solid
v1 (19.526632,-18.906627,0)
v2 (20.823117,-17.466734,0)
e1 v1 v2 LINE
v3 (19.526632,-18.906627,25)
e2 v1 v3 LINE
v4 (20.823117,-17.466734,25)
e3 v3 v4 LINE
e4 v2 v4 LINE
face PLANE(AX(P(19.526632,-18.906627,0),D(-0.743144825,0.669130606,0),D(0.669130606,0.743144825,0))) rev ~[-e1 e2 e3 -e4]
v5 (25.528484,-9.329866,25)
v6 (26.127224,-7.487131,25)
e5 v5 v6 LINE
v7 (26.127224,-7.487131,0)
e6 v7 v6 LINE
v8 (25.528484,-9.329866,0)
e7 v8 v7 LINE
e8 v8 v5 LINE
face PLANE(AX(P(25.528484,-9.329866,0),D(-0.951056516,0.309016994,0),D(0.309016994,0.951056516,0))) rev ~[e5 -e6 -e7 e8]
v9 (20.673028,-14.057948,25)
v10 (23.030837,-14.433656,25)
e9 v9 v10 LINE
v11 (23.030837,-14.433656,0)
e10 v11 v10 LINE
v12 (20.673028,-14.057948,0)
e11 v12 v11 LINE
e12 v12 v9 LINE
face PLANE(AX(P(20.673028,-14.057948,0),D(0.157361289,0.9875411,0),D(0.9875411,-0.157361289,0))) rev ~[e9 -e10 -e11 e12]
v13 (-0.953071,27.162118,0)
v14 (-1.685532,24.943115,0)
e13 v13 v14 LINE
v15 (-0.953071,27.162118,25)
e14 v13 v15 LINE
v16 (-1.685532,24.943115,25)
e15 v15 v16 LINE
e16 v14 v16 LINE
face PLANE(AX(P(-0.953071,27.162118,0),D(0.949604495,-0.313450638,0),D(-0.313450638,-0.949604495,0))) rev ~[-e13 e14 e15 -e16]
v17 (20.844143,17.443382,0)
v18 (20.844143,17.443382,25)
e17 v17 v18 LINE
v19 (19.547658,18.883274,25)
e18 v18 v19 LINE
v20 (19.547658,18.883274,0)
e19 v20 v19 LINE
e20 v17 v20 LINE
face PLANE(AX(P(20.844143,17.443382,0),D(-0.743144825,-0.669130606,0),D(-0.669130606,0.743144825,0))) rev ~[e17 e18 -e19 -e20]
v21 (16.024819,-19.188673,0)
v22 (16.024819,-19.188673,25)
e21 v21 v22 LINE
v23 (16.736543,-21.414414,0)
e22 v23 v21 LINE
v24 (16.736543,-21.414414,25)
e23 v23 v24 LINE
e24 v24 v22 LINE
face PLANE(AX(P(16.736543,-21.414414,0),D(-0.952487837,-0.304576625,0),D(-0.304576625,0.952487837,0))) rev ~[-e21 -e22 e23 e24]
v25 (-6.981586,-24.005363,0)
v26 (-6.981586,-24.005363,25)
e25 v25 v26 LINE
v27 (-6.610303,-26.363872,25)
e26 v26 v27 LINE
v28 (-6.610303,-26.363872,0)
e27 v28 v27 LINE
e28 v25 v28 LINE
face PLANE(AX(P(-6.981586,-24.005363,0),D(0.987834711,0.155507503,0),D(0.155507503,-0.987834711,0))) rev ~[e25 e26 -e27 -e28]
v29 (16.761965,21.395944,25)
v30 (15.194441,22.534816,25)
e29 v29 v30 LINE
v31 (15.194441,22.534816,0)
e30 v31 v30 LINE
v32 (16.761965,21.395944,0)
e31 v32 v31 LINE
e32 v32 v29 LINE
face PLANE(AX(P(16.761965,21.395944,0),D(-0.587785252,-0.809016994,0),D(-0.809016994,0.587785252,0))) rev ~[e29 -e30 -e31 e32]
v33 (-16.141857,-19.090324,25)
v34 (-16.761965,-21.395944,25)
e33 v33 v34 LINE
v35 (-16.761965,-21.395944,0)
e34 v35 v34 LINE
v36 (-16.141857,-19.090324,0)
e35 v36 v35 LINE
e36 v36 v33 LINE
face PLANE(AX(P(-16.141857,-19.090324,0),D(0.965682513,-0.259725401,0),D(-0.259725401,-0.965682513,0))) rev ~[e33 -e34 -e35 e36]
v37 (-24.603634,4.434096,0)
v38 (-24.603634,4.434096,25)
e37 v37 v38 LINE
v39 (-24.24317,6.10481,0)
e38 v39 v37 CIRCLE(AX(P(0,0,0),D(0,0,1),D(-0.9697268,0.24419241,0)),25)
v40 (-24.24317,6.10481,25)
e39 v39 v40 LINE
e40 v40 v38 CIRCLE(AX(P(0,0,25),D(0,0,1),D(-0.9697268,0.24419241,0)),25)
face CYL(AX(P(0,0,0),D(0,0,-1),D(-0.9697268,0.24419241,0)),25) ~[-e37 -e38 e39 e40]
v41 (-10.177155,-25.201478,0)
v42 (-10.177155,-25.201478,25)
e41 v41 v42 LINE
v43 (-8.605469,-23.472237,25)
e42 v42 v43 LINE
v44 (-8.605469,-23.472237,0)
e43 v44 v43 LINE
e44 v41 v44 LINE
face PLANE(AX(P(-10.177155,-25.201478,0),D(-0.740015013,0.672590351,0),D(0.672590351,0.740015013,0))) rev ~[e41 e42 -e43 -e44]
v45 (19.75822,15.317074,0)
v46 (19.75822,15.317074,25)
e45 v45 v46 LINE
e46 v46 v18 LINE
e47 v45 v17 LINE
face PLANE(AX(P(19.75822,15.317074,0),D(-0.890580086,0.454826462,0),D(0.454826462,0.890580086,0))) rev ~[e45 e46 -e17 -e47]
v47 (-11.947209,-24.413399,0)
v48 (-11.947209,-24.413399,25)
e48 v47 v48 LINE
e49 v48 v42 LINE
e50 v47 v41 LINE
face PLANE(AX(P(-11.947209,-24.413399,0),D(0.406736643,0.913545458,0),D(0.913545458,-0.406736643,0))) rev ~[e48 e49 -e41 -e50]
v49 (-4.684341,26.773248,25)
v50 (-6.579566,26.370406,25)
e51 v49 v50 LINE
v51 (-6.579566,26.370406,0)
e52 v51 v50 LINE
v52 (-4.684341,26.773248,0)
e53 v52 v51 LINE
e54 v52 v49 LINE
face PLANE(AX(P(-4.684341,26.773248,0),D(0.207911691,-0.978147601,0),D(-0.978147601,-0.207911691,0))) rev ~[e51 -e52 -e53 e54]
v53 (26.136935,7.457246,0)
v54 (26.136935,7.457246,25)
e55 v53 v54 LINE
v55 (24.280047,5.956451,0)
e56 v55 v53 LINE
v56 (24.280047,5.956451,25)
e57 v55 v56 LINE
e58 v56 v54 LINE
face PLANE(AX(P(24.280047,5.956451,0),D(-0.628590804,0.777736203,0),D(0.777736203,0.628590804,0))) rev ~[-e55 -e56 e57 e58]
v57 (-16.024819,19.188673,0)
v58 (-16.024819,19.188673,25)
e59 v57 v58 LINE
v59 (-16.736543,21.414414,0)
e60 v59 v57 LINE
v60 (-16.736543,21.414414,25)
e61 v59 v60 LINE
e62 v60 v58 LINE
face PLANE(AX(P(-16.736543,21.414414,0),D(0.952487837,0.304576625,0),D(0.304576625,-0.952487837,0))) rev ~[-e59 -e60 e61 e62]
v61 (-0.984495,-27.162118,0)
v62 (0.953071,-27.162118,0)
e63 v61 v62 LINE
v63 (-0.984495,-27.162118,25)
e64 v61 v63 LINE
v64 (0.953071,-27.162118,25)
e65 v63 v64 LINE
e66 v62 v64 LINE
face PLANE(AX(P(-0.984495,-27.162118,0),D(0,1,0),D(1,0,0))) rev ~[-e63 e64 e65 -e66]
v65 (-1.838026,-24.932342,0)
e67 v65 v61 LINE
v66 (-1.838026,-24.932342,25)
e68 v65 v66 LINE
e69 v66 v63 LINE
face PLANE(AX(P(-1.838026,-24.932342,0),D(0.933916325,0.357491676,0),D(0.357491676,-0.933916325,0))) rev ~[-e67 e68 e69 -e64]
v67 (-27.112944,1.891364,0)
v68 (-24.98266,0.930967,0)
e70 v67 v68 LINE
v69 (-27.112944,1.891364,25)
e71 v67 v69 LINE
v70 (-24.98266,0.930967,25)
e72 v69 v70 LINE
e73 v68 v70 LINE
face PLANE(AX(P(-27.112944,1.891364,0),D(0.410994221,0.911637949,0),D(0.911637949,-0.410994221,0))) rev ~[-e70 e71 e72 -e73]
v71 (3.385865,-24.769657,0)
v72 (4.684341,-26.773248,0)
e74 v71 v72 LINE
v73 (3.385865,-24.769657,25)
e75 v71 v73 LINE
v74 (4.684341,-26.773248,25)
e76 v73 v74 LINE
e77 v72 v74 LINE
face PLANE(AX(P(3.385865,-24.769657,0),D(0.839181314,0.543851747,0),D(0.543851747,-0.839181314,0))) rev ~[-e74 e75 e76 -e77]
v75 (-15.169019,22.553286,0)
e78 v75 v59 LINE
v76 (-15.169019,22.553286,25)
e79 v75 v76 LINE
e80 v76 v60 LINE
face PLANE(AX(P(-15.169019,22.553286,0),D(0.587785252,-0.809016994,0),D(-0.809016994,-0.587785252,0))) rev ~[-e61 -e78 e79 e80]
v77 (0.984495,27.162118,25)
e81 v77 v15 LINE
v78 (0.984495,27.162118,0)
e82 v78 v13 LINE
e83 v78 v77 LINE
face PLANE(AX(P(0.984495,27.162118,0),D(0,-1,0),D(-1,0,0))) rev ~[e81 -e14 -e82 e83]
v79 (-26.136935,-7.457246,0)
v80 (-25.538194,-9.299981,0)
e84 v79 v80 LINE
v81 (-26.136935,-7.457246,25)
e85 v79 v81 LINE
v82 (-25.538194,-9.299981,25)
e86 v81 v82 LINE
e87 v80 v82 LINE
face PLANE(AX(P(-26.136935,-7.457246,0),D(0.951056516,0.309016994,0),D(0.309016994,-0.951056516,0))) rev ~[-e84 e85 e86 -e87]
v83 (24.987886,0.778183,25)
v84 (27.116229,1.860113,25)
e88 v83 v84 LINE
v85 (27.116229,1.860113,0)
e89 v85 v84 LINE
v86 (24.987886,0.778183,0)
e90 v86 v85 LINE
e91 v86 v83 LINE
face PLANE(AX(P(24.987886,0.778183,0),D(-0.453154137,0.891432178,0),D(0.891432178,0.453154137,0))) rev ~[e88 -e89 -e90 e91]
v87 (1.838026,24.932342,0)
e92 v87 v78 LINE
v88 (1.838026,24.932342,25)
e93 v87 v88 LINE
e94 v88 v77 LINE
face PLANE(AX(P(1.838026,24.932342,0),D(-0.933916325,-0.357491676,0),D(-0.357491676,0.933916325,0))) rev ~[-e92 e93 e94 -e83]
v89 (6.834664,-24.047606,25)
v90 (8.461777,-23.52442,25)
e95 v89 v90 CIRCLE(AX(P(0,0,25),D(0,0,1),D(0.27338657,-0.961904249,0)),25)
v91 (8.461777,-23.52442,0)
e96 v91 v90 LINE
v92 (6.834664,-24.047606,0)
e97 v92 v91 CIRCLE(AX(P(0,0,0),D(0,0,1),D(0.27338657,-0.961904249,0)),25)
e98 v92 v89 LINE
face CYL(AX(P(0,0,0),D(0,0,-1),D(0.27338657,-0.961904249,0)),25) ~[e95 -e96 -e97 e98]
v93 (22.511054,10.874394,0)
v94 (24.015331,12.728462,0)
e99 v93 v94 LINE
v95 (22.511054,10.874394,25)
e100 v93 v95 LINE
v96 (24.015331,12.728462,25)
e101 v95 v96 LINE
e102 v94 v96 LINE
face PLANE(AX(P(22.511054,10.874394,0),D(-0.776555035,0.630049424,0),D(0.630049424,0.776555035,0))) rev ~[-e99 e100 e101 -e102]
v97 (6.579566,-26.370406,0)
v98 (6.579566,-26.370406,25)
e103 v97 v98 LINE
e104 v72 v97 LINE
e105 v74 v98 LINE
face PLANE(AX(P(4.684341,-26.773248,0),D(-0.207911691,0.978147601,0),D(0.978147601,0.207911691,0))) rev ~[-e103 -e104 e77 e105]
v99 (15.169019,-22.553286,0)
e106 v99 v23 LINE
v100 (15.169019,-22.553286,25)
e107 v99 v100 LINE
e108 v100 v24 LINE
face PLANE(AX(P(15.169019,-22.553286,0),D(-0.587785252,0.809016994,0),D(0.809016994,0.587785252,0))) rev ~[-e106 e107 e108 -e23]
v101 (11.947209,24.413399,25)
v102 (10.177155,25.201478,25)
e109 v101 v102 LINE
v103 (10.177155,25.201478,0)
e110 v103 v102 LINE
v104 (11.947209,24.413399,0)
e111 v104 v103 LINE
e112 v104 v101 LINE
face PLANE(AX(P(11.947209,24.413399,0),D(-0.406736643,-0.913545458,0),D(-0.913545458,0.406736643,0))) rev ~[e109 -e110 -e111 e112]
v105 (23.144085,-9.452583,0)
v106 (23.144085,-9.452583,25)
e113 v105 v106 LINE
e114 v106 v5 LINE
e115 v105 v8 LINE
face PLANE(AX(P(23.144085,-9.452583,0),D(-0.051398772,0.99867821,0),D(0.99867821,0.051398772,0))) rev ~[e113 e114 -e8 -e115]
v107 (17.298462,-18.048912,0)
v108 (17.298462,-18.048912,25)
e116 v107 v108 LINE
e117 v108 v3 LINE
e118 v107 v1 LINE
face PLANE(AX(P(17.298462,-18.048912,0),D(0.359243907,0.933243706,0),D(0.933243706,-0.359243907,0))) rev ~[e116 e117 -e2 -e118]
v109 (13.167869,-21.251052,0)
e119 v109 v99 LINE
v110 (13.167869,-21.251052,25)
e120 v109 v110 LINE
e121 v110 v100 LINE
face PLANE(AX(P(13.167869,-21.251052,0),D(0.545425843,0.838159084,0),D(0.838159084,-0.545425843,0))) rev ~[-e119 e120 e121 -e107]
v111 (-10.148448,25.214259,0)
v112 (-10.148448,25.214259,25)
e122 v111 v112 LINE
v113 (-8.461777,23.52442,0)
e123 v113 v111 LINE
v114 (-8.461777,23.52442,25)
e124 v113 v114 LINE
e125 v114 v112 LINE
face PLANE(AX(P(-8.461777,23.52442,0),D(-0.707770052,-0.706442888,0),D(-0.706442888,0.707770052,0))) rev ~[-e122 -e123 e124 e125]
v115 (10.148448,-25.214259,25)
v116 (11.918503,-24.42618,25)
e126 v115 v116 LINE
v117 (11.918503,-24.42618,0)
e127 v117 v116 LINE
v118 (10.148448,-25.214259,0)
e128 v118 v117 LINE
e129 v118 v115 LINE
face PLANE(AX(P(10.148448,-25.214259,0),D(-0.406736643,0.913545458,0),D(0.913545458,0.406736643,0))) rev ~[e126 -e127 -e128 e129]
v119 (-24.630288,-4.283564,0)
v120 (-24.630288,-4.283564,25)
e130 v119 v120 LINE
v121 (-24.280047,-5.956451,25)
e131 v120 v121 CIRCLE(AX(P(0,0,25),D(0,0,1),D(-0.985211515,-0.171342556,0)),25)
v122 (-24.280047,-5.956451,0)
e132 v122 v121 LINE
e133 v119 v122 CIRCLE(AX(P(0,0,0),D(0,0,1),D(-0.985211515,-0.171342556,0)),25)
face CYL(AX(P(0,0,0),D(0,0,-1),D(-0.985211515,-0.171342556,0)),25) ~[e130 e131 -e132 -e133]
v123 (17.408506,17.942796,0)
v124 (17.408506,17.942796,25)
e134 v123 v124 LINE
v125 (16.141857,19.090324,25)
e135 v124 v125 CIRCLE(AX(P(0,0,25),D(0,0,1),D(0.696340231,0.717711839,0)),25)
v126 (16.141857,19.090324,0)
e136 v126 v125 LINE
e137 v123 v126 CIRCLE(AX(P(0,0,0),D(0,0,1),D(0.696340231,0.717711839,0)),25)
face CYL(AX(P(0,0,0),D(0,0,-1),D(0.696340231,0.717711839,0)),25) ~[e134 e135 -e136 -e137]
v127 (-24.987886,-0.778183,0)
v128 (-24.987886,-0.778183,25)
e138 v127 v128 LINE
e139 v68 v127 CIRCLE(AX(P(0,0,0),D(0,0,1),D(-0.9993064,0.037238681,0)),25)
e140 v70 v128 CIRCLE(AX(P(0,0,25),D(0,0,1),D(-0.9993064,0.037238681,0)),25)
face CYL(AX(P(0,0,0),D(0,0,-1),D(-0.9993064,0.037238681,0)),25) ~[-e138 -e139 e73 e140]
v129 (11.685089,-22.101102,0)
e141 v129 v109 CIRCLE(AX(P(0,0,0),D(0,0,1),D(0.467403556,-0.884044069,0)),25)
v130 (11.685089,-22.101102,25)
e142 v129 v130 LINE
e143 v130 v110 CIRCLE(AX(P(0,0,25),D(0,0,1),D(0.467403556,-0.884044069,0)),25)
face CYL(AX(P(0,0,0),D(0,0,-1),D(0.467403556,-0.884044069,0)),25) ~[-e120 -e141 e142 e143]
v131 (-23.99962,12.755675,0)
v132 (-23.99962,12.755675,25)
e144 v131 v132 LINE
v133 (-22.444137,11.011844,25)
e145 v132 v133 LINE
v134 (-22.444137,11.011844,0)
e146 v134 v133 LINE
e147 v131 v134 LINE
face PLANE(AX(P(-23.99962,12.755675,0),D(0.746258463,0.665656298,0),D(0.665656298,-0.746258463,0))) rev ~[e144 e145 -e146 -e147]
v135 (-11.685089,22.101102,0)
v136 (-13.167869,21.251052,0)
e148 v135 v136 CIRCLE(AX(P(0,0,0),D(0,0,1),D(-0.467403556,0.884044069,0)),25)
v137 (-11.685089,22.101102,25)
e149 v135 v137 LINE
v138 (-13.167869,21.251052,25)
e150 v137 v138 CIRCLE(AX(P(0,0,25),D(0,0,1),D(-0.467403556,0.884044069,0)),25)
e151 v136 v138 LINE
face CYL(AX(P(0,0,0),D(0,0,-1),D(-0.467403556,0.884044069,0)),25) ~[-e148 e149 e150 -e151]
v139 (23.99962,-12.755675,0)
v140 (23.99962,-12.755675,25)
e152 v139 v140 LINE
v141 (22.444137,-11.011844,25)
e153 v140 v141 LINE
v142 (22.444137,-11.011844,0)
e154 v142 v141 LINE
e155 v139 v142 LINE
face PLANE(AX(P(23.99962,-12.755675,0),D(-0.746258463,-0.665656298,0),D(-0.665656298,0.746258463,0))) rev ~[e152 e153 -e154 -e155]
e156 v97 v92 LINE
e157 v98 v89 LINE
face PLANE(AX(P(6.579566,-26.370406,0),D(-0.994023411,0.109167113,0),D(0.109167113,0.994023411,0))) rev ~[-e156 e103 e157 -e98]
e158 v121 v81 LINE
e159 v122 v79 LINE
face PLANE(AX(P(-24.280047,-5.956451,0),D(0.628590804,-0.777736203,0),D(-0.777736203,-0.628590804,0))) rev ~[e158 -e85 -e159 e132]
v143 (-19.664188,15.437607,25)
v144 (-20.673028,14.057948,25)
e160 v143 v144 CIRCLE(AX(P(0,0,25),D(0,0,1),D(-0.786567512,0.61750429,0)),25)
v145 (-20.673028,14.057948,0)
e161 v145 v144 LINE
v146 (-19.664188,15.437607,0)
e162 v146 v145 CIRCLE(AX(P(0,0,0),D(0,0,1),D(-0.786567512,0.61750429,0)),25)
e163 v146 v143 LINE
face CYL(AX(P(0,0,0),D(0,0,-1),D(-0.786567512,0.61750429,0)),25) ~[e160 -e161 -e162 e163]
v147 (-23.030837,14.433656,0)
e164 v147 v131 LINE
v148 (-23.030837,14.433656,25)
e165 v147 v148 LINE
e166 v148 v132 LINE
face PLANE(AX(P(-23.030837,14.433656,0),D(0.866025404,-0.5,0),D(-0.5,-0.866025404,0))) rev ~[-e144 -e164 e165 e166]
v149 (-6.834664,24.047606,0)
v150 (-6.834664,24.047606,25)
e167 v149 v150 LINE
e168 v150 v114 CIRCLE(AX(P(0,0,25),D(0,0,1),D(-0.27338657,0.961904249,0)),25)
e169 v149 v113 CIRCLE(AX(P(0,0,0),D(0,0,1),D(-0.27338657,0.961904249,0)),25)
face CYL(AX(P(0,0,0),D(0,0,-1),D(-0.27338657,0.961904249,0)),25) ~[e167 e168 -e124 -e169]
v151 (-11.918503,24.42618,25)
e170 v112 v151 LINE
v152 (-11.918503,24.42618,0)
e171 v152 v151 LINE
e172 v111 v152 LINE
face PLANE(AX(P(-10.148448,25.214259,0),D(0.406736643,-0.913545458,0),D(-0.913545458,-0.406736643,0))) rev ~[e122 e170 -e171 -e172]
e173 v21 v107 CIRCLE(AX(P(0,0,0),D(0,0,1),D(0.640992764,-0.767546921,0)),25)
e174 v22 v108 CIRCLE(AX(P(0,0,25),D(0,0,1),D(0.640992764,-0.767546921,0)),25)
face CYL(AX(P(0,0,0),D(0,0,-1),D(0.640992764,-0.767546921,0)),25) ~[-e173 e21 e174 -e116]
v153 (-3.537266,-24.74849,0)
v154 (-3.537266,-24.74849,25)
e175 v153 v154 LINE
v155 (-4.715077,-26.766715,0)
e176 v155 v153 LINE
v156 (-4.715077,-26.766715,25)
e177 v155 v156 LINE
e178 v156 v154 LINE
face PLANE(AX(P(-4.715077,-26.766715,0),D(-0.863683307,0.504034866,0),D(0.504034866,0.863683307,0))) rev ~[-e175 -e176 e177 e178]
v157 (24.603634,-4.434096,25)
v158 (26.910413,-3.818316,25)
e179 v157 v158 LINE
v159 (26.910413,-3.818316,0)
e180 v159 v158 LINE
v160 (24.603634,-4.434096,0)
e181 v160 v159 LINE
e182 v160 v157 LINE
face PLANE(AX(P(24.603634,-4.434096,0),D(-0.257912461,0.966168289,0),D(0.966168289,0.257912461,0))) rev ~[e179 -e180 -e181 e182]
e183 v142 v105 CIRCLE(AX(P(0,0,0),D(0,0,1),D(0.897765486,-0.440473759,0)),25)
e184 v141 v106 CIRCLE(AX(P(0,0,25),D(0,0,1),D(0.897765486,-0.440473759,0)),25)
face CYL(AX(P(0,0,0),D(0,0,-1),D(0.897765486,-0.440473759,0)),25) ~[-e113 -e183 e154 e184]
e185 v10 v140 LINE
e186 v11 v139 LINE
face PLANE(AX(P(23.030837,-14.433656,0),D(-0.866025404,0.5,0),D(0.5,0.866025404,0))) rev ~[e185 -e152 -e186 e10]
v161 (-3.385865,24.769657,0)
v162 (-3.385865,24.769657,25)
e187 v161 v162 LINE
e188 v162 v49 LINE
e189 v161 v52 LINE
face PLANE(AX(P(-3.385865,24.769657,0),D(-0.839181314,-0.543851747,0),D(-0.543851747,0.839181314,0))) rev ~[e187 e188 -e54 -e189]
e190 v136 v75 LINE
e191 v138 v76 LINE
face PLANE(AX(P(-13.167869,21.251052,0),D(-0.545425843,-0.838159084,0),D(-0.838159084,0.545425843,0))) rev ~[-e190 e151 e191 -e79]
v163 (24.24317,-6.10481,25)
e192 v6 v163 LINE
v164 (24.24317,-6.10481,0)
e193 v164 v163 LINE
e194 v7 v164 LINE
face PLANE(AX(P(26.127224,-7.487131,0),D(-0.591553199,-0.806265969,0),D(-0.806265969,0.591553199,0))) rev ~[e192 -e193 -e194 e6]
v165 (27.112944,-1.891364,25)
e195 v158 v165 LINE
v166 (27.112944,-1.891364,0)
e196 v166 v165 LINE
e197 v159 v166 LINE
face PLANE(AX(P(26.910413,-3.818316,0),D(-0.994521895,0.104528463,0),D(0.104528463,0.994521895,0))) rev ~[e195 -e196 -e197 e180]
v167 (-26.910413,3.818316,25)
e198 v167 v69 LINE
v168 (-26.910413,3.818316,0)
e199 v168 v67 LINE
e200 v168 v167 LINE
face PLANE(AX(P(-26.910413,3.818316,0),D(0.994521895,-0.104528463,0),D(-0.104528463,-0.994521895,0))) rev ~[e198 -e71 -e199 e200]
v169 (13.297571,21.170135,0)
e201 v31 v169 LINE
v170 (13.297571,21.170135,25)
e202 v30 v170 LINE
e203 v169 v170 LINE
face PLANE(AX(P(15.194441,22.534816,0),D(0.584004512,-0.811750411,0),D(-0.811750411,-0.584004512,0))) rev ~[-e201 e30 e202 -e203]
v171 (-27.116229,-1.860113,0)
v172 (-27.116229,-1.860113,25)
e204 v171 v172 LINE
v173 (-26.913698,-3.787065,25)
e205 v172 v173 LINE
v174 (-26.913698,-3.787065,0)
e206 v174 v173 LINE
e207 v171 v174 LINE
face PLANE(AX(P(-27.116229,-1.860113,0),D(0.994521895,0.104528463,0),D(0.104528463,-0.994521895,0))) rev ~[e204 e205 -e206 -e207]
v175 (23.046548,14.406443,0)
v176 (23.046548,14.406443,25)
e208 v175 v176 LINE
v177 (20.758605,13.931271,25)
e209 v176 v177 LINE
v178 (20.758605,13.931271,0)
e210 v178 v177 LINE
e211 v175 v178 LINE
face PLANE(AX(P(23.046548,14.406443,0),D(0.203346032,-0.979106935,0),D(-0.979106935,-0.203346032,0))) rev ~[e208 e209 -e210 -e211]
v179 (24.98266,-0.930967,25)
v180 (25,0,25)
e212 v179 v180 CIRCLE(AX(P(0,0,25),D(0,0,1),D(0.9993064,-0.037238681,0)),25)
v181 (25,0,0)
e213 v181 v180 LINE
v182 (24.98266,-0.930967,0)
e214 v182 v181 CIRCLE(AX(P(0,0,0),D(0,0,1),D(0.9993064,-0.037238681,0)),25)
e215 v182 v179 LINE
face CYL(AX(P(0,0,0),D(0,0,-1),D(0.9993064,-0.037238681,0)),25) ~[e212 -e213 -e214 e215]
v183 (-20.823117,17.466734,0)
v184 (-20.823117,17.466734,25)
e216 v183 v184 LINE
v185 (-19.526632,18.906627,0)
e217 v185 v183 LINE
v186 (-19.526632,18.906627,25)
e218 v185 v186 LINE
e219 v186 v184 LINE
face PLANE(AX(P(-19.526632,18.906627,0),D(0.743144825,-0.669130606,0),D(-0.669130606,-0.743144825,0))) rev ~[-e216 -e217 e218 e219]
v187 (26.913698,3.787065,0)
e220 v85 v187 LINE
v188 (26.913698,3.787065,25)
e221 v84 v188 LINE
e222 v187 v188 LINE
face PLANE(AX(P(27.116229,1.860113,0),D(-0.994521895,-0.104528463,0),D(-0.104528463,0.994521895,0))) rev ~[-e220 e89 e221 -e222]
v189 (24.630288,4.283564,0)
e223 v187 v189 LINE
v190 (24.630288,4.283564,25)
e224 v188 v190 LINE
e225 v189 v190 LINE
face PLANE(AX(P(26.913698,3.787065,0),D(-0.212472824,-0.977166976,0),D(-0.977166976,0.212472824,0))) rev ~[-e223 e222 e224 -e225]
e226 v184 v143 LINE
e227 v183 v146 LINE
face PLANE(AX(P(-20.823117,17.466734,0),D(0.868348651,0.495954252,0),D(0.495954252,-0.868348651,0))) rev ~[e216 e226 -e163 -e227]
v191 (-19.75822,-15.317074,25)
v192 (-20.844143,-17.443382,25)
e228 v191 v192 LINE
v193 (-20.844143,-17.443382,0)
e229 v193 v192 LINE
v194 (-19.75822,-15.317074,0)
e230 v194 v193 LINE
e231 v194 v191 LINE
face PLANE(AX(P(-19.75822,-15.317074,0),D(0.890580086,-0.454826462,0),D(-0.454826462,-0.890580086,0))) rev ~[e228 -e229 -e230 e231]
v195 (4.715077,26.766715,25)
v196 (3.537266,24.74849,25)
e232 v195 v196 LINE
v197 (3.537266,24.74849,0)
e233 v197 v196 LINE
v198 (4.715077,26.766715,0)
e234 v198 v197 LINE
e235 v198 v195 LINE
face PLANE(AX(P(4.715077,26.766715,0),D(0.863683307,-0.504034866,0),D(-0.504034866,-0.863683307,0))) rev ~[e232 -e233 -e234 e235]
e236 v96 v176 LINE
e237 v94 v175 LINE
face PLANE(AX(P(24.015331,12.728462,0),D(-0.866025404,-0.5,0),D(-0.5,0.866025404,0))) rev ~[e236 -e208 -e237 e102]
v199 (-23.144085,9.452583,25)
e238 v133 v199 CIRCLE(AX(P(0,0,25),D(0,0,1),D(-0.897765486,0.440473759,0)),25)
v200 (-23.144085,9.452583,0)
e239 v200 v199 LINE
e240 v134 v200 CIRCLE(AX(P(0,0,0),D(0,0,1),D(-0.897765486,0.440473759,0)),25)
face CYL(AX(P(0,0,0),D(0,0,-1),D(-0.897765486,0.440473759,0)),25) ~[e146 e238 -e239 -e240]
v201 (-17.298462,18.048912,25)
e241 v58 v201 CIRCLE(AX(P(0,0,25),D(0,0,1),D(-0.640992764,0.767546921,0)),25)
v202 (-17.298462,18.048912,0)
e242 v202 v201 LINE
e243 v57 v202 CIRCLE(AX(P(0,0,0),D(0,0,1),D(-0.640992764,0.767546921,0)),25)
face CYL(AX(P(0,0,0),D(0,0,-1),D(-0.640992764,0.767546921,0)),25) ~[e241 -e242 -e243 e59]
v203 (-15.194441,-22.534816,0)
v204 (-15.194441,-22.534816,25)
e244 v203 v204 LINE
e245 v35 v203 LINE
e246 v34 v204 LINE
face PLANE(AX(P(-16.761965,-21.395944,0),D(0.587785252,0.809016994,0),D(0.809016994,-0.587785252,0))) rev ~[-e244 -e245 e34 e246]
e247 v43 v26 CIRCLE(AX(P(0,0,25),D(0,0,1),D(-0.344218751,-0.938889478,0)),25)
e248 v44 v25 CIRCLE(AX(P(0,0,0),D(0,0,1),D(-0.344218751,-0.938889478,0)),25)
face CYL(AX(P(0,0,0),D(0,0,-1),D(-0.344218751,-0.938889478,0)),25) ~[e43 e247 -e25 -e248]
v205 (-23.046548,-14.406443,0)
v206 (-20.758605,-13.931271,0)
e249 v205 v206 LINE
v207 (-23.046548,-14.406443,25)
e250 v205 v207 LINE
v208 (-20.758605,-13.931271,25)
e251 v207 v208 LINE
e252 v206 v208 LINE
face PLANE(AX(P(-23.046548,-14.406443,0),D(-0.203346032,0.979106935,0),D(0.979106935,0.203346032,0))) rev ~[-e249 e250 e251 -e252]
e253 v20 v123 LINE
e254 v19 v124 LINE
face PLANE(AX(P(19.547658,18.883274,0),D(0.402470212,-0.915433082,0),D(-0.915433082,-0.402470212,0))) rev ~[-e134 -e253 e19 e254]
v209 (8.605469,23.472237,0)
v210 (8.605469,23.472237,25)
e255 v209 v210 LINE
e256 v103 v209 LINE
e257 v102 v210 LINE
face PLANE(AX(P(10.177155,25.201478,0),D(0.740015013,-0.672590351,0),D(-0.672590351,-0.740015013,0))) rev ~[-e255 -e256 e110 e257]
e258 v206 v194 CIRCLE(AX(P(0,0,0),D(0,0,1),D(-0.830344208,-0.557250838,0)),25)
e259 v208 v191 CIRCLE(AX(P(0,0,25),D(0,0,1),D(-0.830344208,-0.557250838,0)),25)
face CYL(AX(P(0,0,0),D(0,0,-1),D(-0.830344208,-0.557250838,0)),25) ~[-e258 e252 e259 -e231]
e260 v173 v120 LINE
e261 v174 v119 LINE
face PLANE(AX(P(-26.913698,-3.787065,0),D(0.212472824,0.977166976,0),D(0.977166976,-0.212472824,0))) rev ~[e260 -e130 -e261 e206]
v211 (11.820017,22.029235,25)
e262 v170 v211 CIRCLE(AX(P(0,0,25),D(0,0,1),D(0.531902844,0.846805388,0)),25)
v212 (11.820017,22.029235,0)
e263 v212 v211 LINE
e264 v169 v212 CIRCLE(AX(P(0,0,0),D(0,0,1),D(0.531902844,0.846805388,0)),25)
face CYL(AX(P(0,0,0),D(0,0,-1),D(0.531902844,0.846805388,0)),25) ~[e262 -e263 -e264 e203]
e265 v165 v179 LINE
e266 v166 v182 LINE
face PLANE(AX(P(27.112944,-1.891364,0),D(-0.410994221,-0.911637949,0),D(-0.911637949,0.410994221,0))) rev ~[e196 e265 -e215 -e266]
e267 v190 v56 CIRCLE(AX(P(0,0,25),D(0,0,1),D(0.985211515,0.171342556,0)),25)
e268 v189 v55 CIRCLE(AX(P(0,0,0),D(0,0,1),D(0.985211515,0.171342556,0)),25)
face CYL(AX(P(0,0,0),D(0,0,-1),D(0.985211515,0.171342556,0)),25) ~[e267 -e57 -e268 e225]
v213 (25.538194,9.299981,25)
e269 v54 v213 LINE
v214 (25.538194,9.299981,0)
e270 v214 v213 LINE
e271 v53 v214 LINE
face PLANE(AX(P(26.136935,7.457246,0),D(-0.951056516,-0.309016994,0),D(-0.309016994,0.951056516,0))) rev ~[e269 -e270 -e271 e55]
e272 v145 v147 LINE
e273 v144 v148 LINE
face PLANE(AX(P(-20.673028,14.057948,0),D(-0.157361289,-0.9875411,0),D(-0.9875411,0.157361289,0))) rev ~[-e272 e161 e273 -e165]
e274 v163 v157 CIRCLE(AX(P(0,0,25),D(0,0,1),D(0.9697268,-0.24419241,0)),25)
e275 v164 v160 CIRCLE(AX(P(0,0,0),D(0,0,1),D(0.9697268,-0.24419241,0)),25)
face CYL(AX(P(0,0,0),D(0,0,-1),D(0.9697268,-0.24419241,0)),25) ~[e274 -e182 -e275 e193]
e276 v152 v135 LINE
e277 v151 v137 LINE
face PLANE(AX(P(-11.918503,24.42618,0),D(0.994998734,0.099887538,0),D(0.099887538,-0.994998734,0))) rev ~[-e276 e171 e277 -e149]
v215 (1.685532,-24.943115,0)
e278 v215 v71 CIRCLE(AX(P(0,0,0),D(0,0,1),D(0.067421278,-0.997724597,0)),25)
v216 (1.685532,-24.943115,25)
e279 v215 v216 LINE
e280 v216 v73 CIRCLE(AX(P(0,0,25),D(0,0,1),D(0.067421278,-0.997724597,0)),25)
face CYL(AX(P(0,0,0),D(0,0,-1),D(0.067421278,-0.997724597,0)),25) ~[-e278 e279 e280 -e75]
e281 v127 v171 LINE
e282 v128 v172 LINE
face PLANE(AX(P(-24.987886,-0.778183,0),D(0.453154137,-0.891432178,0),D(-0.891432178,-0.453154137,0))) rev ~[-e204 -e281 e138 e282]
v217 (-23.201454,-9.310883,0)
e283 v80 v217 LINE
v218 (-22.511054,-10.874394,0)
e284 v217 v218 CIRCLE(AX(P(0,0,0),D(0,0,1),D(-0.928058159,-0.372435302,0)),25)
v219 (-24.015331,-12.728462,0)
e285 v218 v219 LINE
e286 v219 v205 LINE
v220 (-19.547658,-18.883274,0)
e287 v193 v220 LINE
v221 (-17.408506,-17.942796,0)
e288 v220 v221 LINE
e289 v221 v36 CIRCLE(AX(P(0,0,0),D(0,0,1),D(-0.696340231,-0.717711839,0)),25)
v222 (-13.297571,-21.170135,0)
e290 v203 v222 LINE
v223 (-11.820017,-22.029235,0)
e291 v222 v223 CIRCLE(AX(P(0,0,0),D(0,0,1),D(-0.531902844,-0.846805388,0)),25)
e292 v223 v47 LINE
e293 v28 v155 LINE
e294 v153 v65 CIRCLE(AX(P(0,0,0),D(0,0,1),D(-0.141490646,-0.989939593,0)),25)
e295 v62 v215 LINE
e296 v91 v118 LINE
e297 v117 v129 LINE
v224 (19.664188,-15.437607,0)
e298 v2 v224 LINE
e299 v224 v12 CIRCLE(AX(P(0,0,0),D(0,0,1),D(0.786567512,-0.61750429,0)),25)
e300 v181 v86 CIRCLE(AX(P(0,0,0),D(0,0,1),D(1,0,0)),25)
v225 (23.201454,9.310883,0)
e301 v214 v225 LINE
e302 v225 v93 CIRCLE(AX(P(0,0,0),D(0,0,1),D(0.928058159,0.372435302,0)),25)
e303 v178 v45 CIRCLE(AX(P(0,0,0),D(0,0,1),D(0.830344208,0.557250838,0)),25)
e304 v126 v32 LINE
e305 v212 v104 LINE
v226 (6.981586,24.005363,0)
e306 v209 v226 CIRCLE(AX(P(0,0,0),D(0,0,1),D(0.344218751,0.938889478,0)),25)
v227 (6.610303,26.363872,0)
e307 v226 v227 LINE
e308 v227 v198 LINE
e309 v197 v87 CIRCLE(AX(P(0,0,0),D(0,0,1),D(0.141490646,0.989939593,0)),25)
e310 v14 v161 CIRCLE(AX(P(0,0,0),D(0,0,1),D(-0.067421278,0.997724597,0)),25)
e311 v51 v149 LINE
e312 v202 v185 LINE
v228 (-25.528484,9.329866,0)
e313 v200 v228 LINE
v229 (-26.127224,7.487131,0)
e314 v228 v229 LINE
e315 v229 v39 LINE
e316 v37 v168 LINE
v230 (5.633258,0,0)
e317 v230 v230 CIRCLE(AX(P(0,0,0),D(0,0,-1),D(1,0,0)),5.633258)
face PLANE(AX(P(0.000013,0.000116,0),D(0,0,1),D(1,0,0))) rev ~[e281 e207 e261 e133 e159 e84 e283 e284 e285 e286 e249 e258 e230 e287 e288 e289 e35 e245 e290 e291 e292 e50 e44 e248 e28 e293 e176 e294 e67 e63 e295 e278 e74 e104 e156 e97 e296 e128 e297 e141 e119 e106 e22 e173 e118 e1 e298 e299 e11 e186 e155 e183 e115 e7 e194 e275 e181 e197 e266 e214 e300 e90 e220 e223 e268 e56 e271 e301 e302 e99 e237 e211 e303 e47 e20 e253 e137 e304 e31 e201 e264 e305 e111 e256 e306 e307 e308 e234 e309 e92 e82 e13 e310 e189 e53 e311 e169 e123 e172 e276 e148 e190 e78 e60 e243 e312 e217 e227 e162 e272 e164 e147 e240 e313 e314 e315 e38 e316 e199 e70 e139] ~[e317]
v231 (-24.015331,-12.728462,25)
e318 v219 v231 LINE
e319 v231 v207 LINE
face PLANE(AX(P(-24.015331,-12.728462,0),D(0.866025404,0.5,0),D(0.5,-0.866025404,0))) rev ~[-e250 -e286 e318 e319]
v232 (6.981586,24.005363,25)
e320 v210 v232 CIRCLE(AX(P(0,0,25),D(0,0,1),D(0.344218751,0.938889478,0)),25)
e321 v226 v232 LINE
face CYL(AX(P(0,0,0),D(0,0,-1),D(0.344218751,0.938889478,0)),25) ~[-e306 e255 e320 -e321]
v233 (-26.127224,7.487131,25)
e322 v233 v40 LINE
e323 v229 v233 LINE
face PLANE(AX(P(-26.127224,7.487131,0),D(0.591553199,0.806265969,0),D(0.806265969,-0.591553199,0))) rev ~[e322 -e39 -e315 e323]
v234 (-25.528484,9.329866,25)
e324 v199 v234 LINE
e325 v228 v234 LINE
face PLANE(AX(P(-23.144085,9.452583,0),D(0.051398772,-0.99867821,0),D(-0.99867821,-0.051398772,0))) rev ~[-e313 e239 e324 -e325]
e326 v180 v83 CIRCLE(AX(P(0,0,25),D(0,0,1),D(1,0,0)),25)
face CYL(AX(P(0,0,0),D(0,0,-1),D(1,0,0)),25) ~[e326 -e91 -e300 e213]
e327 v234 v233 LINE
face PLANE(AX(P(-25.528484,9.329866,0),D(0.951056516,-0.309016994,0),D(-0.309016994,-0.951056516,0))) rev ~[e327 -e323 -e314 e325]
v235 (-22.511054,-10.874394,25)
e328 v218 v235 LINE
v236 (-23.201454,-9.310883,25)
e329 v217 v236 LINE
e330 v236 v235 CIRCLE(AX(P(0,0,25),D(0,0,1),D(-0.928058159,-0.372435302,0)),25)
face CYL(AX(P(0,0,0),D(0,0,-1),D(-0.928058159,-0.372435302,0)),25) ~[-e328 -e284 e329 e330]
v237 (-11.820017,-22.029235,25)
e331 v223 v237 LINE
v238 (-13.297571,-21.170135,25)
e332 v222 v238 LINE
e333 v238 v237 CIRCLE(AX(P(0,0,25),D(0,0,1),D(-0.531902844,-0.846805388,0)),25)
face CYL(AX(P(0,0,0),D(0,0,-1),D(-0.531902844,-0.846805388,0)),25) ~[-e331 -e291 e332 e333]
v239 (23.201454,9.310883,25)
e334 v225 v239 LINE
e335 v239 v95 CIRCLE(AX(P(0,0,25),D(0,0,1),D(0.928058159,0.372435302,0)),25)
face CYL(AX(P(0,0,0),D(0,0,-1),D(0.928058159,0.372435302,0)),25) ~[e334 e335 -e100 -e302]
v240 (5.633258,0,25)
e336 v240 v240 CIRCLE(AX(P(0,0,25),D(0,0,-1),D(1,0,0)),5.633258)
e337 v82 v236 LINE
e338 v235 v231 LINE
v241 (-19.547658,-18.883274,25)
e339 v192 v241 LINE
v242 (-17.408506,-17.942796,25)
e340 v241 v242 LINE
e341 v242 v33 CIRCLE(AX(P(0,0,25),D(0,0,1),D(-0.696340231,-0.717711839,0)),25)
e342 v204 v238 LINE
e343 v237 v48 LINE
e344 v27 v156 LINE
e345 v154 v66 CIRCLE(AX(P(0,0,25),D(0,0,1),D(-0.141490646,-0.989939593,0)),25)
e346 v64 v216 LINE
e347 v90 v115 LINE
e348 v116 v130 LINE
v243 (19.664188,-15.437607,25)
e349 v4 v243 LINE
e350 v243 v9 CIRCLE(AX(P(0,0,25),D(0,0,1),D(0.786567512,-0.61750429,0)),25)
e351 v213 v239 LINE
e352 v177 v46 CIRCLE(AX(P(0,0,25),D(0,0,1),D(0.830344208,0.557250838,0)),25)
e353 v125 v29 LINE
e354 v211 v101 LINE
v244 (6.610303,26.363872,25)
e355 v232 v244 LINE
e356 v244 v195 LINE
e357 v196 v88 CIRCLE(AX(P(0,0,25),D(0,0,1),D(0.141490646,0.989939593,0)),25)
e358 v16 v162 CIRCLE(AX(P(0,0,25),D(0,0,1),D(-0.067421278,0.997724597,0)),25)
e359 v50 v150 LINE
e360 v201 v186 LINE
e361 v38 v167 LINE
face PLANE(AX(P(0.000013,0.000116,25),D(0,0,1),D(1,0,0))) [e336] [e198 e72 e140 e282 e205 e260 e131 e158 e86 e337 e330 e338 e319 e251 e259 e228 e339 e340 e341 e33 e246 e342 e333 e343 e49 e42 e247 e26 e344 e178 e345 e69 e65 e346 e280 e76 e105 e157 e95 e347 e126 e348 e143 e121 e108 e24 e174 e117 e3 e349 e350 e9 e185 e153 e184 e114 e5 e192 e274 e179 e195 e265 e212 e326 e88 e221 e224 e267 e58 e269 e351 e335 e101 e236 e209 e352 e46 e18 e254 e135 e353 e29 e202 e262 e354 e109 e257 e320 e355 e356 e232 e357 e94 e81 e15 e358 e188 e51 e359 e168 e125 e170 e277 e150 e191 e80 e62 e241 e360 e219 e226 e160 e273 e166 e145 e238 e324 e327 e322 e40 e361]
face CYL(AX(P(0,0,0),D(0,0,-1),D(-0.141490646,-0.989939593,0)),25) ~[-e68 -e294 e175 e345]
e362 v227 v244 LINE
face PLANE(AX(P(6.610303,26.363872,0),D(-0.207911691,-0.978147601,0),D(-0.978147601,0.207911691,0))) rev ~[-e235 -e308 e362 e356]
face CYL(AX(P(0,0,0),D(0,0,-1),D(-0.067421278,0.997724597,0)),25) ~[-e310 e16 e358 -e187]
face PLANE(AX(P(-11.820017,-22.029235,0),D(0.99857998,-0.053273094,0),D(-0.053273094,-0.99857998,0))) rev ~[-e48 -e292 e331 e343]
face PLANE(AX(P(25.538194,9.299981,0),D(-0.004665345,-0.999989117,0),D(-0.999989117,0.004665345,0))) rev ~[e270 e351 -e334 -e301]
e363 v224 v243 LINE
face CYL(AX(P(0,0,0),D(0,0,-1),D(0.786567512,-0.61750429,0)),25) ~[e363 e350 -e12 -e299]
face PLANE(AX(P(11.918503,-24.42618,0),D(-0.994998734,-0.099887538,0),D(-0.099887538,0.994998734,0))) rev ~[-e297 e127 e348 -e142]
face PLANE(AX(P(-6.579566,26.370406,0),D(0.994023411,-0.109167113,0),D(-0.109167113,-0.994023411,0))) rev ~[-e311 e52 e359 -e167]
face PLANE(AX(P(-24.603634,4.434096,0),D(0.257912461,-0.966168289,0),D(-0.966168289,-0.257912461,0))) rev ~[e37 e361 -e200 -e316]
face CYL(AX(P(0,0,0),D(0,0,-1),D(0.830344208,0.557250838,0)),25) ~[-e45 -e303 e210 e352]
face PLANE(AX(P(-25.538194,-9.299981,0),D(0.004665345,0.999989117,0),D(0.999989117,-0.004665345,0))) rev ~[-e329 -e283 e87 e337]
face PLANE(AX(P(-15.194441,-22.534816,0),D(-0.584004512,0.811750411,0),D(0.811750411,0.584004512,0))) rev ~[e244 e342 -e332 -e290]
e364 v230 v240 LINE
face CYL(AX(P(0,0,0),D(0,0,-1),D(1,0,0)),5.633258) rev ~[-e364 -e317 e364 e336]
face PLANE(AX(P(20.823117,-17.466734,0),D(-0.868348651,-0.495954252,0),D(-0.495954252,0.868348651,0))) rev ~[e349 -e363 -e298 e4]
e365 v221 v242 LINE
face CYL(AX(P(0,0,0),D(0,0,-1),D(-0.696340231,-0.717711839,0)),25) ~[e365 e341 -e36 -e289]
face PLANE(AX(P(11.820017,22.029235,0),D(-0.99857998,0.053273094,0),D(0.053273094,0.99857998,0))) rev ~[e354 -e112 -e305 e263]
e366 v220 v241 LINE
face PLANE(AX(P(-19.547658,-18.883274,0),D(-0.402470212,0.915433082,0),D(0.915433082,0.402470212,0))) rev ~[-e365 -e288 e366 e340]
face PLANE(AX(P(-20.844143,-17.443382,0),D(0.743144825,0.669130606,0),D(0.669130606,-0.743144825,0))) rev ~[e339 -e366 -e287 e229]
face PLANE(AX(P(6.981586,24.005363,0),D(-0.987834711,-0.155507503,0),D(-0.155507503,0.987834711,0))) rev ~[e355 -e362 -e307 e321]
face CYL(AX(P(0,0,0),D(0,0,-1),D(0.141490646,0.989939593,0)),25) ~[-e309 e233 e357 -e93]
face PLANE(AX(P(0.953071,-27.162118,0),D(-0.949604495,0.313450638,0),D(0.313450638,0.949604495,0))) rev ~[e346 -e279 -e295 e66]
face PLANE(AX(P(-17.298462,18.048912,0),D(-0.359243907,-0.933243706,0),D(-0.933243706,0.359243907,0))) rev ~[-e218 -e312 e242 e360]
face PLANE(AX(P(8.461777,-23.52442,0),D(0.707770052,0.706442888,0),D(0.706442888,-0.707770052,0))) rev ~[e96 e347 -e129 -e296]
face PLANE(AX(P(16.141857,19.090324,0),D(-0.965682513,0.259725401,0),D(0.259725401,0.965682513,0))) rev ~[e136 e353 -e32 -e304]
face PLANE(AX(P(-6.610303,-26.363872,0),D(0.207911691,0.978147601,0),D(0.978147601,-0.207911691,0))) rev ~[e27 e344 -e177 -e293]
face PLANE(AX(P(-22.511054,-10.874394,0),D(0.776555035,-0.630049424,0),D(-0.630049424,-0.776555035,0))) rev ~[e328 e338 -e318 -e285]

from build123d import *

# Parameters (mm, degrees)
F1_DEPTH = 25
F2_R     = 5.6332582932
F3_DEPTH = 25.001


with BuildPart() as f1:
    # F0 (on Top) → F1 (new body)
    with BuildSketch(Plane.XY):
        with BuildLine():
            ThreePointArc((24.9826599942, -0.9309670328), (24.9956646226, -0.4655642523), (25, 0))
            ThreePointArc((25, 0), (24.9969712413, 0.3891384843), (24.9878856992, 0.77818268))
            ThreePointArc((24.9878856992, 0.77818268), (24.8709209984, 2.5371812491), (24.6302878631, 4.283563911))
            ThreePointArc((24.6302878631, 4.283563911), (24.4694678339, 5.1230014568), (24.2800471673, 5.956451087))
            ThreePointArc((24.2800471673, 5.956451087), (23.7999220592, 7.6526929884), (23.2014539632, 9.3108825571))
            ThreePointArc((23.2014539632, 9.3108825571), (22.869619358, 10.0985400143), (22.5110540656, 10.8743939994))
            ThreePointArc((22.5110540656, 10.8743939994), (21.6887523213, 12.4337453224), (20.7586051922, 13.9312709568))
            ThreePointArc((20.7586051922, 13.9312709568), (20.2702587756, 14.6327239149), (19.7582198813, 15.3170737128))
            ThreePointArc((19.7582198813, 15.3170737128), (18.6296800329, 16.6713833221), (17.4085057635, 17.9427959661))
            ThreePointArc((17.4085057635, 17.9427959661), (16.7849906172, 18.5273875649), (16.1418566776, 19.0903238055))
            ThreePointArc((16.1418566776, 19.0903238055), (14.7564013318, 20.1804018725), (13.2975710976, 21.1701346926))
            ThreePointArc((13.2975710976, 21.1701346926), (12.5661378255, 21.6123154741), (11.82001688, 22.0292351424))
            ThreePointArc((11.82001688, 22.0292351424), (10.2381970835, 22.8074400247), (8.6054687659, 23.4722369475))
            ThreePointArc((8.6054687659, 23.4722369475), (7.7980845118, 23.7526814896), (6.9815856259, 24.0053631955))
            ThreePointArc((6.9815856259, 24.0053631955), (5.2725344943, 24.4376836056), (3.5372661556, 24.7484898154))
            ThreePointArc((3.5372661556, 24.7484898154), (2.6892174855, 24.854941346), (1.8380255786, 24.9323416865))
            ThreePointArc((1.8380255786, 24.9323416865), (0.9196352096, 24.9830796957), (0, 25))
            ThreePointArc((0, 25), (-0.8432457973, 24.9857746833), (-1.6855319595, 24.943114922))
            ThreePointArc((-1.6855319595, 24.943114922), (-2.5371812491, 24.8709209984), (-3.3858650063, 24.7696572071))
            ThreePointArc((-3.3858650063, 24.7696572071), (-5.1230014568, 24.4694678339), (-6.8346642398, 24.0476062162))
            ThreePointArc((-6.8346642398, 24.0476062162), (-7.6526929884, 23.7999220592), (-8.4617770432, 23.5244198498))
            ThreePointArc((-8.4617770432, 23.5244198498), (-10.0985400143, 22.869619358), (-11.6850888965, 22.1011017255))
            ThreePointArc((-11.6850888965, 22.1011017255), (-12.4337453224, 21.6887523213), (-13.1678688193, 21.2510524624))
            ThreePointArc((-13.1678688193, 21.2510524624), (-14.6327239149, 20.2702587756), (-16.0248190972, 19.1886730365))
            ThreePointArc((-16.0248190972, 19.1886730365), (-16.6713833221, 18.6296800329), (-17.2984615414, 18.0489121085))
            ThreePointArc((-17.2984615414, 18.0489121085), (-18.5273875649, 16.7849906172), (-19.6641878077, 15.4376072584))
            ThreePointArc((-19.6641878077, 15.4376072584), (-20.1804018725, 14.7564013318), (-20.673028487, 14.0579476871))
            ThreePointArc((-20.673028487, 14.0579476871), (-21.6123154741, 12.5661378255), (-22.4441371517, 11.0118439652))
            ThreePointArc((-22.4441371517, 11.0118439652), (-22.8074400247, 10.2381970835), (-23.1440848876, 9.4525834943))
            ThreePointArc((-23.1440848876, 9.4525834943), (-23.7526814896, 7.7980845118), (-24.2431700033, 6.1048102501))
            ThreePointArc((-24.2431700033, 6.1048102501), (-24.4376836056, 5.2725344943), (-24.6036337208, 4.4340960443))
            ThreePointArc((-24.6036337208, 4.4340960443), (-24.854941346, 2.6892174855), (-24.9826599942, 0.9309670328))
            ThreePointArc((-24.9826599942, 0.9309670328), (-24.9998831479, 0.0764368473), (-24.9878856992, -0.77818268))
            ThreePointArc((-24.9878856992, -0.77818268), (-24.8709209984, -2.5371812491), (-24.6302878631, -4.283563911))
            ThreePointArc((-24.6302878631, -4.283563911), (-24.4694678339, -5.1230014568), (-24.2800471673, -5.956451087))
            ThreePointArc((-24.2800471673, -5.956451087), (-23.7999220592, -7.6526929884), (-23.2014539632, -9.3108825571))
            ThreePointArc((-23.2014539632, -9.3108825571), (-22.869619358, -10.0985400143), (-22.5110540656, -10.8743939994))
            ThreePointArc((-22.5110540656, -10.8743939994), (-21.6887523213, -12.4337453224), (-20.7586051922, -13.9312709568))
            ThreePointArc((-20.7586051922, -13.9312709568), (-20.2702587756, -14.6327239149), (-19.7582198813, -15.3170737128))
            ThreePointArc((-19.7582198813, -15.3170737128), (-18.6296800329, -16.6713833221), (-17.4085057635, -17.9427959661))
            ThreePointArc((-17.4085057635, -17.9427959661), (-16.7849906172, -18.5273875649), (-16.1418566776, -19.0903238055))
            ThreePointArc((-16.1418566776, -19.0903238055), (-14.7564013318, -20.1804018725), (-13.2975710976, -21.1701346926))
            ThreePointArc((-13.2975710976, -21.1701346926), (-12.5661378255, -21.6123154741), (-11.82001688, -22.0292351424))
            ThreePointArc((-11.82001688, -22.0292351424), (-10.2381970835, -22.8074400247), (-8.6054687659, -23.4722369475))
            ThreePointArc((-8.6054687659, -23.4722369475), (-7.7980845118, -23.7526814896), (-6.9815856259, -24.0053631955))
            ThreePointArc((-6.9815856259, -24.0053631955), (-5.2725344943, -24.4376836056), (-3.5372661556, -24.7484898154))
            ThreePointArc((-3.5372661556, -24.7484898154), (-2.6892174855, -24.854941346), (-1.8380255786, -24.9323416865))
            ThreePointArc((-1.8380255786, -24.9323416865), (-0.0764368473, -24.9998831479), (1.6855319595, -24.943114922))
            ThreePointArc((1.6855319595, -24.943114922), (2.5371812491, -24.8709209984), (3.3858650063, -24.7696572071))
            ThreePointArc((3.3858650063, -24.7696572071), (5.1230014568, -24.4694678339), (6.8346642398, -24.0476062162))
            ThreePointArc((6.8346642398, -24.0476062162), (7.6526929884, -23.7999220592), (8.4617770432, -23.5244198498))
            ThreePointArc((8.4617770432, -23.5244198498), (10.0985400143, -22.869619358), (11.6850888965, -22.1011017255))
            ThreePointArc((11.6850888965, -22.1011017255), (12.4337453224, -21.6887523213), (13.1678688193, -21.2510524624))
            ThreePointArc((13.1678688193, -21.2510524624), (14.6327239149, -20.2702587756), (16.0248190972, -19.1886730365))
            ThreePointArc((16.0248190972, -19.1886730365), (16.6713833221, -18.6296800329), (17.2984615414, -18.0489121085))
            ThreePointArc((17.2984615414, -18.0489121085), (18.5273875649, -16.7849906172), (19.6641878077, -15.4376072584))
            ThreePointArc((19.6641878077, -15.4376072584), (20.1804018725, -14.7564013318), (20.673028487, -14.0579476871))
            ThreePointArc((20.673028487, -14.0579476871), (21.6123154741, -12.5661378255), (22.4441371517, -11.0118439652))
            ThreePointArc((22.4441371517, -11.0118439652), (22.8074400247, -10.2381970835), (23.1440848876, -9.4525834943))
            ThreePointArc((23.1440848876, -9.4525834943), (23.7526814896, -7.7980845118), (24.2431700033, -6.1048102501))
            ThreePointArc((24.2431700033, -6.1048102501), (24.4376836056, -5.2725344943), (24.6036337208, -4.4340960443))
            ThreePointArc((24.6036337208, -4.4340960443), (24.854941346, -2.6892174855), (24.9826599942, -0.9309670328))
        make_face()
        with BuildLine():
            ThreePointArc((24.6302878631, 4.283563911), (24.8709209984, 2.5371812491), (24.9878856992, 0.77818268))
            Line((24.9878856992, 0.77818268), (27.1162286769, 1.8601129156))
            Line((27.1162286769, 1.8601129156), (26.9136978769, 3.7870647602))
            Line((26.9136978769, 3.7870647602), (24.6302878631, 4.283563911))
        make_face()
        with BuildLine():
            Line((27.1129440427, -1.8913641228), (24.9826599942, -0.9309670328))
            ThreePointArc((24.9826599942, -0.9309670328), (24.854941346, -2.6892174855), (24.6036337208, -4.4340960443))
            Line((24.6036337208, -4.4340960443), (26.9104132427, -3.8183159673))
            Line((26.9104132427, -3.8183159673), (27.1129440427, -1.8913641228))
        make_face()
        with BuildLine():
            ThreePointArc((23.2014539632, 9.3108825571), (23.7999220592, 7.6526929884), (24.2800471673, 5.956451087))
            Line((24.2800471673, 5.956451087), (26.1369347999, 7.4572459383))
            Line((26.1369347999, 7.4572459383), (25.5381939676, 9.2999807407))
            Line((25.5381939676, 9.2999807407), (23.2014539632, 9.3108825571))
        make_face()
        with BuildLine():
            Line((26.1272244515, -7.4871313177), (24.2431700033, -6.1048102501))
            ThreePointArc((24.2431700033, -6.1048102501), (23.7526814896, -7.7980845118), (23.1440848876, -9.4525834943))
            Line((23.1440848876, -9.4525834943), (25.5284836192, -9.3298661202))
            Line((25.5284836192, -9.3298661202), (26.1272244515, -7.4871313177))
        make_face()
        with BuildLine():
            ThreePointArc((20.7586051922, 13.9312709568), (21.6887523213, 12.4337453224), (22.5110540656, 10.8743939994))
            Line((22.5110540656, 10.8743939994), (24.0153314531, 12.7284615297))
            Line((24.0153314531, 12.7284615297), (23.0465484361, 14.4064429367))
            Line((23.0465484361, 14.4064429367), (20.7586051922, 13.9312709568))
        make_face()
        with BuildLine():
            Line((23.9996197794, -12.7556749469), (22.4441371517, -11.0118439652))
            ThreePointArc((22.4441371517, -11.0118439652), (21.6123154741, -12.5661378255), (20.673028487, -14.0579476871))
            Line((20.673028487, -14.0579476871), (23.0308367624, -14.4336563539))
            Line((23.0308367624, -14.4336563539), (23.9996197794, -12.7556749469))
        make_face()
        with BuildLine():
            ThreePointArc((17.4085057635, 17.9427959661), (18.6296800329, 16.6713833221), (19.7582198813, 15.3170737128))
            Line((19.7582198813, 15.3170737128), (20.8441428836, 17.4433822743))
            Line((20.8441428836, 17.4433822743), (19.5476581484, 18.8832744465))
            Line((19.5476581484, 18.8832744465), (17.4085057635, 17.9427959661))
        make_face()
        with BuildLine():
            Line((20.82311656, -17.4667343724), (19.6641878077, -15.4376072584))
            ThreePointArc((19.6641878077, -15.4376072584), (18.5273875649, -16.7849906172), (17.2984615414, -18.0489121085))
            Line((17.2984615414, -18.0489121085), (19.5266318248, -18.9066265446))
            Line((19.5266318248, -18.9066265446), (20.82311656, -17.4667343724))
        make_face()
        with BuildLine():
            ThreePointArc((13.2975710976, 21.1701346926), (14.7564013318, 20.1804018725), (16.1418566776, 19.0903238055))
            Line((16.1418566776, 19.0903238055), (16.7619652487, 21.3959435108))
            Line((16.7619652487, 21.3959435108), (15.1944413994, 22.534816251))
            Line((15.1944413994, 22.534816251), (13.2975710976, 21.1701346926))
        make_face()
        with BuildLine():
            Line((16.7365432265, -21.4144136911), (16.0248190972, -19.1886730365))
            ThreePointArc((16.0248190972, -19.1886730365), (14.6327239149, -20.2702587756), (13.1678688193, -21.2510524624))
            Line((13.1678688193, -21.2510524624), (15.1690193773, -22.5532864312))
            Line((15.1690193773, -22.5532864312), (16.7365432265, -21.4144136911))
        make_face()
        with BuildLine():
            ThreePointArc((8.6054687659, 23.4722369475), (10.2381970835, 22.8074400247), (11.82001688, 22.0292351424))
            Line((11.82001688, 22.0292351424), (11.9472092996, 24.4133993468))
            Line((11.9472092996, 24.4133993468), (10.1771546504, 25.2014784512))
            Line((10.1771546504, 25.2014784512), (8.6054687659, 23.4722369475))
        make_face()
        with BuildLine():
            Line((11.9185026432, -24.4261803737), (11.6850888965, -22.1011017255))
            ThreePointArc((11.6850888965, -22.1011017255), (10.0985400143, -22.869619358), (8.4617770432, -23.5244198498))
            Line((8.4617770432, -23.5244198498), (10.148447994, -25.2142594781))
            Line((10.148447994, -25.2142594781), (11.9185026432, -24.4261803737))
        make_face()
        with BuildLine():
            ThreePointArc((3.5372661556, 24.7484898154), (5.2725344943, 24.4376836056), (6.9815856259, 24.0053631955))
            Line((6.9815856259, 24.0053631955), (6.6103029751, 26.3638724829))
            Line((6.6103029751, 26.3638724829), (4.7150774076, 26.7667151131))
            Line((4.7150774076, 26.7667151131), (3.5372661556, 24.7484898154))
        make_face()
        with BuildLine():
            Line((6.5795663031, -26.3704057642), (6.8346642398, -24.0476062162))
            ThreePointArc((6.8346642398, -24.0476062162), (5.1230014568, -24.4694678339), (3.3858650063, -24.7696572071))
            Line((3.3858650063, -24.7696572071), (4.6843407356, -26.7732483944))
            Line((4.6843407356, -26.7732483944), (6.5795663031, -26.3704057642))
        make_face()
        with BuildLine():
            ThreePointArc((0, 25), (0.9196352096, 24.9830796957), (1.8380255786, 24.9323416865))
            Line((1.8380255786, 24.9323416865), (0.9844946908, 27.1621178836))
            Line((0.9844946908, 27.1621178836), (-0.9530713432, 27.1621178836))
            Line((-0.9530713432, 27.1621178836), (-1.6855319595, 24.943114922))
            ThreePointArc((-1.6855319595, 24.943114922), (-0.8432457973, 24.9857746833), (0, 25))
        make_face()
        with BuildLine():
            Line((0.9530713432, -27.1621178836), (1.6855319595, -24.943114922))
            ThreePointArc((1.6855319595, -24.943114922), (-0.0764368473, -24.9998831479), (-1.8380255786, -24.9323416865))
            Line((-1.8380255786, -24.9323416865), (-0.9844946908, -27.1621178836))
            Line((-0.9844946908, -27.1621178836), (0.9530713432, -27.1621178836))
        make_face()
        with BuildLine():
            Line((-4.7150774076, -26.7667151131), (-3.5372661556, -24.7484898154))
            ThreePointArc((-3.5372661556, -24.7484898154), (-5.2725344943, -24.4376836056), (-6.9815856259, -24.0053631955))
            Line((-6.9815856259, -24.0053631955), (-6.6103029751, -26.3638724829))
            Line((-6.6103029751, -26.3638724829), (-4.7150774076, -26.7667151131))
        make_face()
        with BuildLine():
            ThreePointArc((-6.8346642398, 24.0476062162), (-5.1230014568, 24.4694678339), (-3.3858650063, 24.7696572071))
            Line((-3.3858650063, 24.7696572071), (-4.6843407356, 26.7732483944))
            Line((-4.6843407356, 26.7732483944), (-6.5795663031, 26.3704057642))
            Line((-6.5795663031, 26.3704057642), (-6.8346642398, 24.0476062162))
        make_face()
        with BuildLine():
            Line((-10.1771546504, -25.2014784512), (-8.6054687659, -23.4722369475))
            ThreePointArc((-8.6054687659, -23.4722369475), (-10.2381970835, -22.8074400247), (-11.82001688, -22.0292351424))
            Line((-11.82001688, -22.0292351424), (-11.9472092996, -24.4133993468))
            Line((-11.9472092996, -24.4133993468), (-10.1771546504, -25.2014784512))
        make_face()
        with BuildLine():
            ThreePointArc((-11.6850888965, 22.1011017255), (-10.0985400143, 22.869619358), (-8.4617770432, 23.5244198498))
            Line((-8.4617770432, 23.5244198498), (-10.148447994, 25.2142594781))
            Line((-10.148447994, 25.2142594781), (-11.9185026432, 24.4261803737))
            Line((-11.9185026432, 24.4261803737), (-11.6850888965, 22.1011017255))
        make_face()
        with BuildLine():
            Line((-15.1944413994, -22.534816251), (-13.2975710976, -21.1701346926))
            ThreePointArc((-13.2975710976, -21.1701346926), (-14.7564013318, -20.1804018725), (-16.1418566776, -19.0903238055))
            Line((-16.1418566776, -19.0903238055), (-16.7619652487, -21.3959435108))
            Line((-16.7619652487, -21.3959435108), (-15.1944413994, -22.534816251))
        make_face()
        with BuildLine():
            ThreePointArc((-16.0248190972, 19.1886730365), (-14.6327239149, 20.2702587756), (-13.1678688193, 21.2510524624))
            Line((-13.1678688193, 21.2510524624), (-15.1690193773, 22.5532864312))
            Line((-15.1690193773, 22.5532864312), (-16.7365432265, 21.4144136911))
            Line((-16.7365432265, 21.4144136911), (-16.0248190972, 19.1886730365))
        make_face()
        with BuildLine():
            Line((-19.5476581484, -18.8832744465), (-17.4085057635, -17.9427959661))
            ThreePointArc((-17.4085057635, -17.9427959661), (-18.6296800329, -16.6713833221), (-19.7582198813, -15.3170737128))
            Line((-19.7582198813, -15.3170737128), (-20.8441428836, -17.4433822743))
            Line((-20.8441428836, -17.4433822743), (-19.5476581484, -18.8832744465))
        make_face()
        with BuildLine():
            ThreePointArc((-19.6641878077, 15.4376072584), (-18.5273875649, 16.7849906172), (-17.2984615414, 18.0489121085))
            Line((-17.2984615414, 18.0489121085), (-19.5266318248, 18.9066265446))
            Line((-19.5266318248, 18.9066265446), (-20.82311656, 17.4667343724))
            Line((-20.82311656, 17.4667343724), (-19.6641878077, 15.4376072584))
        make_face()
        with BuildLine():
            Line((-23.0465484361, -14.4064429367), (-20.7586051922, -13.9312709568))
            ThreePointArc((-20.7586051922, -13.9312709568), (-21.6887523213, -12.4337453224), (-22.5110540656, -10.8743939994))
            Line((-22.5110540656, -10.8743939994), (-24.0153314531, -12.7284615297))
            Line((-24.0153314531, -12.7284615297), (-23.0465484361, -14.4064429367))
        make_face()
        with BuildLine():
            ThreePointArc((-22.4441371517, 11.0118439652), (-21.6123154741, 12.5661378255), (-20.673028487, 14.0579476871))
            Line((-20.673028487, 14.0579476871), (-23.0308367624, 14.4336563539))
            Line((-23.0308367624, 14.4336563539), (-23.9996197794, 12.7556749469))
            Line((-23.9996197794, 12.7556749469), (-22.4441371517, 11.0118439652))
        make_face()
        with BuildLine():
            Line((-25.5381939676, -9.2999807407), (-23.2014539632, -9.3108825571))
            ThreePointArc((-23.2014539632, -9.3108825571), (-23.7999220592, -7.6526929884), (-24.2800471673, -5.956451087))
            Line((-24.2800471673, -5.956451087), (-26.1369347999, -7.4572459383))
            Line((-26.1369347999, -7.4572459383), (-25.5381939676, -9.2999807407))
        make_face()
        with BuildLine():
            ThreePointArc((-24.2431700033, 6.1048102501), (-23.7526814896, 7.7980845118), (-23.1440848876, 9.4525834943))
            Line((-23.1440848876, 9.4525834943), (-25.5284836192, 9.3298661202))
            Line((-25.5284836192, 9.3298661202), (-26.1272244515, 7.4871313177))
            Line((-26.1272244515, 7.4871313177), (-24.2431700033, 6.1048102501))
        make_face()
        with BuildLine():
            Line((-26.9136978769, -3.7870647602), (-24.6302878631, -4.283563911))
            ThreePointArc((-24.6302878631, -4.283563911), (-24.8709209984, -2.5371812491), (-24.9878856992, -0.77818268))
            Line((-24.9878856992, -0.77818268), (-27.1162286769, -1.8601129156))
            Line((-27.1162286769, -1.8601129156), (-26.9136978769, -3.7870647602))
        make_face()
        with BuildLine():
            ThreePointArc((-24.9826599942, 0.9309670328), (-24.854941346, 2.6892174855), (-24.6036337208, 4.4340960443))
            Line((-24.6036337208, 4.4340960443), (-26.9104132427, 3.8183159673))
            Line((-26.9104132427, 3.8183159673), (-27.1129440427, 1.8913641228))
            Line((-27.1129440427, 1.8913641228), (-24.9826599942, 0.9309670328))
        make_face()
    extrude(amount=F1_DEPTH)

    # F2 (on face) → F3 (cut, through all)
    with BuildSketch(Plane(origin=(0, 0, 0), x_dir=(1, 0, 0), z_dir=(0, 0, -1))):
        Circle(F2_R)
    extrude(amount=-F3_DEPTH, mode=Mode.SUBTRACT)


solid = f1.part
